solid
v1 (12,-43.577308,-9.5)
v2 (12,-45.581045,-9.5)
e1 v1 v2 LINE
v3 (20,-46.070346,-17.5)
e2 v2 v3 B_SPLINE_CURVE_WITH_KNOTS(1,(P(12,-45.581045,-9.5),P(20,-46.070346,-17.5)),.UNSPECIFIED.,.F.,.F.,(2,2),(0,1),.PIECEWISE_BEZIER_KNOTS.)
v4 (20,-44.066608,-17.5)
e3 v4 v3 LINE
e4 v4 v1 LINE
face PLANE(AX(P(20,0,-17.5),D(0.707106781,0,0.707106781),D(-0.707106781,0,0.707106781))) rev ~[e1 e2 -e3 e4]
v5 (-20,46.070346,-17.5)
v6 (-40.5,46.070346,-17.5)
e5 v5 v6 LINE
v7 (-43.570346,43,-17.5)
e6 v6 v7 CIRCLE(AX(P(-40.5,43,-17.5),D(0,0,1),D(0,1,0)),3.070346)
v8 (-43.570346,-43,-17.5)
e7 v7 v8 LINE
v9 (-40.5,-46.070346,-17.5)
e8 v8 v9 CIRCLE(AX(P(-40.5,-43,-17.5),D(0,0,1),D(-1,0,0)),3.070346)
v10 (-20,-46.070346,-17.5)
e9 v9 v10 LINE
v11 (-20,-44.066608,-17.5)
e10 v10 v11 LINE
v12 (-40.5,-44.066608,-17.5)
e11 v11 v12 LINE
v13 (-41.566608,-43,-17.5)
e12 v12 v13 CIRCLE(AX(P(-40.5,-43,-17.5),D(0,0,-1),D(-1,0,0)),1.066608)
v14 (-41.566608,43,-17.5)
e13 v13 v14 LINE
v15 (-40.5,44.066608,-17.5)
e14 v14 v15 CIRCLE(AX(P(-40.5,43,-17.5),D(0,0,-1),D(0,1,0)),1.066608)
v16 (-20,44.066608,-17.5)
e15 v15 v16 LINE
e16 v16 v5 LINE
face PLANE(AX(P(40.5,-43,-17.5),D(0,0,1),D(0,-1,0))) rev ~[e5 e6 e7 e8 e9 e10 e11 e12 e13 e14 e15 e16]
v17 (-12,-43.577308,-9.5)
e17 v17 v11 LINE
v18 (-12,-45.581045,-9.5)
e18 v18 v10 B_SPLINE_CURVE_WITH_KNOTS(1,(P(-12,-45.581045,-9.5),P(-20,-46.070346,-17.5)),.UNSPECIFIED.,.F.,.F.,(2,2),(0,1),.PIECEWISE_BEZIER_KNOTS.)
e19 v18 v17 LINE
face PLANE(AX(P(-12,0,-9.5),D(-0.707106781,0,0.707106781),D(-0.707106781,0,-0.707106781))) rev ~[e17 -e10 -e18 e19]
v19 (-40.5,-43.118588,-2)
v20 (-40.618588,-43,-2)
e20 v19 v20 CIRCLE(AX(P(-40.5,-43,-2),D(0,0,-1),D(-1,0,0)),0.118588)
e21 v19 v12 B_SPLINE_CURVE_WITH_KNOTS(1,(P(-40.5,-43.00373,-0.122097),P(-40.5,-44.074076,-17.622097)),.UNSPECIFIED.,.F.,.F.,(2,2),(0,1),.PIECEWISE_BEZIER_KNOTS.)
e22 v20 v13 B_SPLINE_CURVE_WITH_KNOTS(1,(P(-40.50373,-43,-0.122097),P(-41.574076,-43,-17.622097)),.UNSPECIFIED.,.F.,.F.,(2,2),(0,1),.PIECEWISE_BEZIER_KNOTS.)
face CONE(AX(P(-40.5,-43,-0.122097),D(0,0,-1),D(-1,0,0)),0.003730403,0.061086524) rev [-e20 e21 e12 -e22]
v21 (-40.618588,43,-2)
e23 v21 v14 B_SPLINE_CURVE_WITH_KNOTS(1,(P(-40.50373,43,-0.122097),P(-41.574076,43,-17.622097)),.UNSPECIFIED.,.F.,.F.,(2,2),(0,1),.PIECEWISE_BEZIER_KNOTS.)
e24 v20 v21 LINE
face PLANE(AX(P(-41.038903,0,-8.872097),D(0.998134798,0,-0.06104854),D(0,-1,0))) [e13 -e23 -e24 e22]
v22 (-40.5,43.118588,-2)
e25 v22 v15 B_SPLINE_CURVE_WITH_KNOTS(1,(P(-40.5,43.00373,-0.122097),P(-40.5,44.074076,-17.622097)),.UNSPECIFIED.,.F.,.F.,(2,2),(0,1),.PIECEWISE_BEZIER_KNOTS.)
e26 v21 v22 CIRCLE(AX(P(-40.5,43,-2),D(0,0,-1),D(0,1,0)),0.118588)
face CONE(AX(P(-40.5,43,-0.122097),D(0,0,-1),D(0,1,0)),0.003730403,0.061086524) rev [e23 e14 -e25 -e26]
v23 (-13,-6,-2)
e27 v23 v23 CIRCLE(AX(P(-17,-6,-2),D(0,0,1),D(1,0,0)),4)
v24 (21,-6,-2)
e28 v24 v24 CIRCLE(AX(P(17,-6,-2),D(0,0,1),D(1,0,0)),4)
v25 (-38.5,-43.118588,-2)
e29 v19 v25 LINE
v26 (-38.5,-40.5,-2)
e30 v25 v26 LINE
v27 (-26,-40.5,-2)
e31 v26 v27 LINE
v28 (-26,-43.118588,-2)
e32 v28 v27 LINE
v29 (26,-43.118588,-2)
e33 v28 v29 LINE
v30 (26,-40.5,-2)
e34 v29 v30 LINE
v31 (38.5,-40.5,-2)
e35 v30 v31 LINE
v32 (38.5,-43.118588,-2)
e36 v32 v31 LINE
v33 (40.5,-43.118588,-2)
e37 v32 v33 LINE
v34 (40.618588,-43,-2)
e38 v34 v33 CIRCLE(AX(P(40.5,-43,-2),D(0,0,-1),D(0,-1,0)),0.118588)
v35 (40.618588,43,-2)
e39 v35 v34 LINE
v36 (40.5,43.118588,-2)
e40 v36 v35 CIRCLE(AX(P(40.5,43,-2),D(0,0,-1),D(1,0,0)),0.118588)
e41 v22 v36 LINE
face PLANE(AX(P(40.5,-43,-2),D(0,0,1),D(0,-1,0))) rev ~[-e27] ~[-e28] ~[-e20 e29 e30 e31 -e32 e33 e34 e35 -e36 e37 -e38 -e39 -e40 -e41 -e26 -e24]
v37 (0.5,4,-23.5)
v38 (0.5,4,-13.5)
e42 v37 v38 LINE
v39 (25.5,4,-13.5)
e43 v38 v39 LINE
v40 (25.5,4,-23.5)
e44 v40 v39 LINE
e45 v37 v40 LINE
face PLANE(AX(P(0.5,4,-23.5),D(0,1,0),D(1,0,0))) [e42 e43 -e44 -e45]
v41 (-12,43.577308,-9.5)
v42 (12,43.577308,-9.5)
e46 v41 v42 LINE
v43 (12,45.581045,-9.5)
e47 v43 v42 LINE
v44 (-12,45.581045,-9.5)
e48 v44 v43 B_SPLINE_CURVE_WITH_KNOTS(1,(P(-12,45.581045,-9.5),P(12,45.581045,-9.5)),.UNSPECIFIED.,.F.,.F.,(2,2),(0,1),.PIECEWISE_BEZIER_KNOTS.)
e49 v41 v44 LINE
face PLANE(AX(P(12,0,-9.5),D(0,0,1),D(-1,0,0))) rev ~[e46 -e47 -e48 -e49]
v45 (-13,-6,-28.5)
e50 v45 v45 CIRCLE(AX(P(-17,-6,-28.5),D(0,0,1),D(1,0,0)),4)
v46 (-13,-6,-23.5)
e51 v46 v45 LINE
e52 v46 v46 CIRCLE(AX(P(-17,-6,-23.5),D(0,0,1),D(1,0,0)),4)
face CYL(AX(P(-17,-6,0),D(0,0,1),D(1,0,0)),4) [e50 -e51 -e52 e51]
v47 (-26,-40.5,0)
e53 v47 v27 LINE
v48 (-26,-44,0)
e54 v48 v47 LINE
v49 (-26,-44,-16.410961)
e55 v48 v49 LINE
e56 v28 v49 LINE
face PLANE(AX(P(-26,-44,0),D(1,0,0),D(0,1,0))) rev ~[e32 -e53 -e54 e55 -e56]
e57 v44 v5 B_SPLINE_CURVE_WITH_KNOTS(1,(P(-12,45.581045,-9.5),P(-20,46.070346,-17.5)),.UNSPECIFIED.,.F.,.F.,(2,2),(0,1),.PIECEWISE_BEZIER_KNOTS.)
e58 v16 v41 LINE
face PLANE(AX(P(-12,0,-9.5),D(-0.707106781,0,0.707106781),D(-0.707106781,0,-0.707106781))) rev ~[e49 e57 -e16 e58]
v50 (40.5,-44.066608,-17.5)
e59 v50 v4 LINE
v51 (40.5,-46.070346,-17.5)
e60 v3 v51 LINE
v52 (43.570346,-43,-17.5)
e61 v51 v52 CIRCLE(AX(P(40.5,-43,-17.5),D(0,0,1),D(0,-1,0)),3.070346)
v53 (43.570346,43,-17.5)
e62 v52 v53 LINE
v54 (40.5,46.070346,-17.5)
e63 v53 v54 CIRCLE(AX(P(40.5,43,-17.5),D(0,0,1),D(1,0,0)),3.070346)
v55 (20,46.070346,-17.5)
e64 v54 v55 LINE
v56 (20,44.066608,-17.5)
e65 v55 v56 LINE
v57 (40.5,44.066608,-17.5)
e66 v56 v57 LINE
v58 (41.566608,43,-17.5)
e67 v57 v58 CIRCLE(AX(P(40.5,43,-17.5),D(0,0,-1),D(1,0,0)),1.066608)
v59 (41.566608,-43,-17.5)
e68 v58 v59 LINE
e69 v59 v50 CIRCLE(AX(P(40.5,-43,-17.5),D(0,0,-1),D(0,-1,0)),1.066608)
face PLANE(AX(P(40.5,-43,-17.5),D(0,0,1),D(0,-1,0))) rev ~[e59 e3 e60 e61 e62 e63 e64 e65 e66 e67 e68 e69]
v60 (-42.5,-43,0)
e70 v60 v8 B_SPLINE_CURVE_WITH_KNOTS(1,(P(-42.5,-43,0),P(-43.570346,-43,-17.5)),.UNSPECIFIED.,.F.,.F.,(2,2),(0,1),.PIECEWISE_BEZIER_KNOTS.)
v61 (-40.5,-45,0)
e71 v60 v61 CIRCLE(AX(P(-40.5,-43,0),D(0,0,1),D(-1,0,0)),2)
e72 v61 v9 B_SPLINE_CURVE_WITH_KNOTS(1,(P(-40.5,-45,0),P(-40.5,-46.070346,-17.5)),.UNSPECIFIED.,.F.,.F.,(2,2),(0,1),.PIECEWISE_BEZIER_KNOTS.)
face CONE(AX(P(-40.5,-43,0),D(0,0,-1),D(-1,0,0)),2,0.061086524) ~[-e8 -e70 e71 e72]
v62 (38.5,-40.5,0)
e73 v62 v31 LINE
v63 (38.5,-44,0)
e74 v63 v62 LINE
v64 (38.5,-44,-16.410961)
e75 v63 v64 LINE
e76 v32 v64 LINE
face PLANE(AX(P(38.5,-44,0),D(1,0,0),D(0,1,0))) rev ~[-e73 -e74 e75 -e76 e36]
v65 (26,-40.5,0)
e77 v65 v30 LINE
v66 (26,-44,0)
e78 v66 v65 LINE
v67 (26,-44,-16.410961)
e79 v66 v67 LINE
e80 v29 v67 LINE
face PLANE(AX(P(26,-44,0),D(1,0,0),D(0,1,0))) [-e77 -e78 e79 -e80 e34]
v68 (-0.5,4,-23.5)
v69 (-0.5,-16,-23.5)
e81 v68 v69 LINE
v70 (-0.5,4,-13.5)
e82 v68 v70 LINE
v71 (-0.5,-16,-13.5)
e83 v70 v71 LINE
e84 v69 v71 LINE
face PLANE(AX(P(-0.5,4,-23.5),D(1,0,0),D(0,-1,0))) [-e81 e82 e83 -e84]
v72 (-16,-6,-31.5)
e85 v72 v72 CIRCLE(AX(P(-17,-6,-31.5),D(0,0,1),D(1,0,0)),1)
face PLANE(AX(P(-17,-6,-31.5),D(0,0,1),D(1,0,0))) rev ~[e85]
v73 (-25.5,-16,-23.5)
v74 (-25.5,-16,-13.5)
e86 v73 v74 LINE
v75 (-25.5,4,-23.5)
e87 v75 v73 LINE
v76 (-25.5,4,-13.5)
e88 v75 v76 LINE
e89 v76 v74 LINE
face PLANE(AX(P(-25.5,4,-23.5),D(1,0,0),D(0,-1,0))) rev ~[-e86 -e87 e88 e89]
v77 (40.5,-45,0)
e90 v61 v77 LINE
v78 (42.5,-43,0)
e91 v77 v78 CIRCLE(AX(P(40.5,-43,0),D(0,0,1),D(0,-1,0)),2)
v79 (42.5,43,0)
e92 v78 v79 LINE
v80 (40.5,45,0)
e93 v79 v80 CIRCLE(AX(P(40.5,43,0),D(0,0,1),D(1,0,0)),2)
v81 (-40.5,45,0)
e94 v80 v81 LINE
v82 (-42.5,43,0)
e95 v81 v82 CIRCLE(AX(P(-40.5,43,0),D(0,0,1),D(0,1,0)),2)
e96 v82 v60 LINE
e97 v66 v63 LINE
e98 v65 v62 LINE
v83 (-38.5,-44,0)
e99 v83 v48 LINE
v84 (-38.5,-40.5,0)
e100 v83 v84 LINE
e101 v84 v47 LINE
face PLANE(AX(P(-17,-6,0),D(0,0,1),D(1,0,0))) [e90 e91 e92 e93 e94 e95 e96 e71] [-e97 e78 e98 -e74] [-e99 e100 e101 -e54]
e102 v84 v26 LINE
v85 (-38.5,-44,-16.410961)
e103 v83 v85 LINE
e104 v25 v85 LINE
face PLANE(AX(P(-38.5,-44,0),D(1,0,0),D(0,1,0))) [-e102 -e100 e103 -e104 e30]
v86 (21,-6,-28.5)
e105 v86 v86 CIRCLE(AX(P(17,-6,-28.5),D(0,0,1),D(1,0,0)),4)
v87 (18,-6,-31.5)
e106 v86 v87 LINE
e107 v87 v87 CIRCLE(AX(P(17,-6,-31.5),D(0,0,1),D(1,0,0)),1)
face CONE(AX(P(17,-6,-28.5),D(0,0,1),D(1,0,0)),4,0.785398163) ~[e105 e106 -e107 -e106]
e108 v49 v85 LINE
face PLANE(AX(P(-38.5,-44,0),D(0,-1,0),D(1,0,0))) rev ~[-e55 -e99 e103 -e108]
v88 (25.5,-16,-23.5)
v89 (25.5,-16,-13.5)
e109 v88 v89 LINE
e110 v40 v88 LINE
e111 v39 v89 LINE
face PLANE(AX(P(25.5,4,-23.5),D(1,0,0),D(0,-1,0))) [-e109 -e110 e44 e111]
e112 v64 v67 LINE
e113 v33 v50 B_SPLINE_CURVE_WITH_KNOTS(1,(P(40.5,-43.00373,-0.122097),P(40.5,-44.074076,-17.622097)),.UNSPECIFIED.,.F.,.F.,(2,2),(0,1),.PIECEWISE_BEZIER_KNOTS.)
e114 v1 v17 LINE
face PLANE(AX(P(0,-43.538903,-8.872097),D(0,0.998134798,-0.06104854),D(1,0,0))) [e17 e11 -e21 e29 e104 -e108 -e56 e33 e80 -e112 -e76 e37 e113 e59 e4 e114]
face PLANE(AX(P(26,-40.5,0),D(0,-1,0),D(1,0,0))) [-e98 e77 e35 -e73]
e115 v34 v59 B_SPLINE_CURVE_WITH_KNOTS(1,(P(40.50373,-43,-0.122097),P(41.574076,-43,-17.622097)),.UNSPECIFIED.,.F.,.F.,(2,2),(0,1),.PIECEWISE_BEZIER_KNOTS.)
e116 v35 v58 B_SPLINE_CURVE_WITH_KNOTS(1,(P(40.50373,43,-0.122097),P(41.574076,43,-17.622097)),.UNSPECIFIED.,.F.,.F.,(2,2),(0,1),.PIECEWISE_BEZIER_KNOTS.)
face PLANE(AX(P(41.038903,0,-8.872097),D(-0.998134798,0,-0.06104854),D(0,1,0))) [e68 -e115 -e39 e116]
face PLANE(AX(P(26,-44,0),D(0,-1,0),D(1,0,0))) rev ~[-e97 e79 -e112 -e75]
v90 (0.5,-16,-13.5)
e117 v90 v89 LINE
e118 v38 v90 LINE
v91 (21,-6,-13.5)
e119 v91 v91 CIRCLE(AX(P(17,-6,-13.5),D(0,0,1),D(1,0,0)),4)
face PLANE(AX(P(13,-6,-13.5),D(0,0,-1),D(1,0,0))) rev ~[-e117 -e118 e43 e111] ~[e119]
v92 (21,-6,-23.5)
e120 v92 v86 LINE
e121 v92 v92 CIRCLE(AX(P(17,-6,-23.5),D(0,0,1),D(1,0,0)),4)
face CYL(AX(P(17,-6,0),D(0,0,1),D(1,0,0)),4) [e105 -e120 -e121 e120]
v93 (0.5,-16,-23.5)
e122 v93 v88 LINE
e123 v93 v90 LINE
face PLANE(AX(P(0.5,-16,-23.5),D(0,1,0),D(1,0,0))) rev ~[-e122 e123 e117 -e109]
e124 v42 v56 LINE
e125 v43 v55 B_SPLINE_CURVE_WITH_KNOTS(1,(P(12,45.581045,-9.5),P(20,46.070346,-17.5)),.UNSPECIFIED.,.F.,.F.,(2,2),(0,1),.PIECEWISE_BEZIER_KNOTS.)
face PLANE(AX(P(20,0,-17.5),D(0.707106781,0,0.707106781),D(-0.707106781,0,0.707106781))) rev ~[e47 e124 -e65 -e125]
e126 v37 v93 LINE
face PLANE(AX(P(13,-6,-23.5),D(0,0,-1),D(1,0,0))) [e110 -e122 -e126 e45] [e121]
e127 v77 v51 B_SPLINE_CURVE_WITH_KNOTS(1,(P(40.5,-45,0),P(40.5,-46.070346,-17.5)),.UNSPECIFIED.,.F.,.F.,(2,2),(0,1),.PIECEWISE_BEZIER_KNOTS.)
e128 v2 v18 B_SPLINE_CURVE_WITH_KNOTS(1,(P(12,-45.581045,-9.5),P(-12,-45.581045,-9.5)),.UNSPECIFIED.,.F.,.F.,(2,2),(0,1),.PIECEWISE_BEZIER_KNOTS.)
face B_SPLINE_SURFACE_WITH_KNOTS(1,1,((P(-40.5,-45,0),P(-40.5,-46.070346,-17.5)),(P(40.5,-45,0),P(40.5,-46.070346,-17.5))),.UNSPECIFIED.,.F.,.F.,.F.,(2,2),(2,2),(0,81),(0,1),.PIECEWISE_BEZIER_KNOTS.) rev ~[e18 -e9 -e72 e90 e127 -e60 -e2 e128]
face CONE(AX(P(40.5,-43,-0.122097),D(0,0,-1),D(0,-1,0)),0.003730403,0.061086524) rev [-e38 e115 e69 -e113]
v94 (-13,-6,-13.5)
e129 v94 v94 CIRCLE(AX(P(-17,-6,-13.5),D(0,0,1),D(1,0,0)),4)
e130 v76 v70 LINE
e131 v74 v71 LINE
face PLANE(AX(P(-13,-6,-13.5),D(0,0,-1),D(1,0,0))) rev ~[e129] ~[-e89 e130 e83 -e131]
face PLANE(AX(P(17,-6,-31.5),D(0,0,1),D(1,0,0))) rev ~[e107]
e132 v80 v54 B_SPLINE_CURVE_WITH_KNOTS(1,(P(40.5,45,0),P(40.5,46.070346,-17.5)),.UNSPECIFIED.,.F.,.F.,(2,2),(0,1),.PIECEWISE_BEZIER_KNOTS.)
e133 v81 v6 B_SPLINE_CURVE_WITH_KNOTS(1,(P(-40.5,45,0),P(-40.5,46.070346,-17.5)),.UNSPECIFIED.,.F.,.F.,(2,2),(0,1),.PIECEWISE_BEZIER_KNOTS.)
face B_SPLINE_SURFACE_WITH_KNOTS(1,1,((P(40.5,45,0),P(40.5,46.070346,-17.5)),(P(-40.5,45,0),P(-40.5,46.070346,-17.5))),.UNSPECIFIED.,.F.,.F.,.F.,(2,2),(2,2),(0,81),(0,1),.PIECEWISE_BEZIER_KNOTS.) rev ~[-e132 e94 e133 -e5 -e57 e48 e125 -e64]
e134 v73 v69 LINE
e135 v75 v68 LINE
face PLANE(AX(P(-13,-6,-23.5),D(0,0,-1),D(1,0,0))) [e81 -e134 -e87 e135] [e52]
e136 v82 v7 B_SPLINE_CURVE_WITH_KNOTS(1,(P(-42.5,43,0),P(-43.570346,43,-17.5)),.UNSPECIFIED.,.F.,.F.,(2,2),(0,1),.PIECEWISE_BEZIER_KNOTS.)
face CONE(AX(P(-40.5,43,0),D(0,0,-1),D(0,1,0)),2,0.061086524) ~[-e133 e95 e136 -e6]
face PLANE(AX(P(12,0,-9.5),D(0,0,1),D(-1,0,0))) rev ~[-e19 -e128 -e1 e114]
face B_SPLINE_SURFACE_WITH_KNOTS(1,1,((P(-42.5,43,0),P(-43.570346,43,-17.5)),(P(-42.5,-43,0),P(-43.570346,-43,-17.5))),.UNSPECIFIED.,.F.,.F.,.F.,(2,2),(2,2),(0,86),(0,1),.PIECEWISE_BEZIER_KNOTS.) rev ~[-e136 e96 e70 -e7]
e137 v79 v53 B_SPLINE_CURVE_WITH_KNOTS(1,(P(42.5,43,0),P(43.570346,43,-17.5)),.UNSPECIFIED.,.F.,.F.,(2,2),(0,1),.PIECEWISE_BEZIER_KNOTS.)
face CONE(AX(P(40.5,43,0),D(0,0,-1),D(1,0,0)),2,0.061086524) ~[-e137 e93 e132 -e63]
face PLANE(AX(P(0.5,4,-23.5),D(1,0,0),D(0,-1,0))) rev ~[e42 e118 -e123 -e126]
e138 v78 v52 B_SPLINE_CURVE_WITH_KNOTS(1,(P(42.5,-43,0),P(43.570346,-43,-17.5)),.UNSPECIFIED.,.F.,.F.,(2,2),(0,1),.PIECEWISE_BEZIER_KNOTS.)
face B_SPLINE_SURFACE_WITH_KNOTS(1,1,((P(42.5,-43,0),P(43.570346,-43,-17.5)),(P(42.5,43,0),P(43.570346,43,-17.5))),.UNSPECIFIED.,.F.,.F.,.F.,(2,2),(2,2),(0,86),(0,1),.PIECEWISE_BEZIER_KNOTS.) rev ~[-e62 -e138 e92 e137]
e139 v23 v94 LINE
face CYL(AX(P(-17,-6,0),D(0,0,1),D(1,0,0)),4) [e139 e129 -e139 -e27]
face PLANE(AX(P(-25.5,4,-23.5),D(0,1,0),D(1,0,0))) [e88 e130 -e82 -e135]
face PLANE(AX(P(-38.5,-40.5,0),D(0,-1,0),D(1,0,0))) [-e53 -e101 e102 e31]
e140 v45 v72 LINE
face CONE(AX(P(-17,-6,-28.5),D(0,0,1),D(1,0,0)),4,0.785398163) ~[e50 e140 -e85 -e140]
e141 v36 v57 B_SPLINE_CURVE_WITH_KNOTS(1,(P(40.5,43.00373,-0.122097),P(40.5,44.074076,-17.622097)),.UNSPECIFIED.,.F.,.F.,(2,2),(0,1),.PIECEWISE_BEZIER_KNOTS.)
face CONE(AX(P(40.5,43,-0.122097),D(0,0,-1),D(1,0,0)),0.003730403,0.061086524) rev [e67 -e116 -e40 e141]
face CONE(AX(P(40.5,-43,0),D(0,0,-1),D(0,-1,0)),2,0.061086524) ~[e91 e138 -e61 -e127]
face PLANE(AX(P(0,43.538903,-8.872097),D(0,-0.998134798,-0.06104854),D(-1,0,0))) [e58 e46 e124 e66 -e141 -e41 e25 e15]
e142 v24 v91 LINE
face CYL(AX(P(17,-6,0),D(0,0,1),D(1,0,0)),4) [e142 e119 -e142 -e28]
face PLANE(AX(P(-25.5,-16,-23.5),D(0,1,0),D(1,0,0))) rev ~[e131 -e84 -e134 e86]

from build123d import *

# Parameters (mm, degrees)
F1_DEPTH  = 17.5
F1_TAPER  = -3.5
F3_DEPTH  = 75
F4_T      = 2
F5_W      = 12.5
F5_H      = 3.5
F6_DEPTH  = 17.5010001
F7_R      = 4
F8_DEPTH  = 31.5
F9_SIZE   = 3
F11_W     = 25
F11_H     = 20
F12_DEPTH = 10


# Not quite as in the source:
# - a shell that OpenCascade refuses in one call is made with other operations: the cavity is built on its own and cut out


with BuildPart() as f1:
    # F0 (on Top) → F1 (new body)
    with BuildSketch(Plane.XY):
        with BuildLine():
            Line((-40.5, -45), (40.5, -45))
            ThreePointArc((40.5, -45), (41.9142135624, -44.4142135624), (42.5, -43))
            Line((42.5, -43), (42.5, 43))
            ThreePointArc((42.5, 43), (41.9142135624, 44.4142135624), (40.5, 45))
            Line((40.5, 45), (-40.5, 45))
            ThreePointArc((-40.5, 45), (-41.9142135624, 44.4142135624), (-42.5, 43))
            Line((-42.5, 43), (-42.5, -43))
            ThreePointArc((-42.5, -43), (-41.9142135624, -44.4142135624), (-40.5, -45))
        make_face()
    extrude(amount=-F1_DEPTH, taper=F1_TAPER)

    # F2 (on Front) → F3 (cut, symmetric)
    with BuildSketch(Plane.XZ):
        Polygon((-20, -17.5), (0, -17.5), (20, -17.5), (12, -9.5), (0, -9.5), (-12, -9.5), align=None)
    extrude(amount=F3_DEPTH, both=True, mode=Mode.SUBTRACT)

    # F4: shell of thickness 2, made by hand


with BuildPart() as f4_core1:
    # F4_t2: copy of F1
    add(f1.part)

    # the walls: a layer under each face that stays
    f4_faces = [f4_core1.faces().sort_by_distance(p)[0] for p in [
        (0, -45.5351729263, -8.75),
        (-42.2926379677, -44.7926379677, -8.75),
        (42.2926379677, -44.7926379677, -8.75),
        (0, 0, 0),
        (-43.0351729263, 0, -8.75),
        (-42.2926379677, 44.7926379677, -8.75),
        (0, 45.5351729263, -8.75),
        (42.2926379677, 44.7926379677, -8.75),
        (43.0351729263, 0, -8.75),
    ]]
    thicken(f4_faces, amount=-F4_T, mode=Mode.SUBTRACT)


with BuildPart() as f1_1:
    add(f1.part)

    # what is left inside the walls is the cavity
    f4_cavity = [f4_core1.part.solids().sort_by_distance(p)[0] for p in [
        (-13.539529, 0, -2.02),
    ]]
    add(f4_cavity, mode=Mode.SUBTRACT)

    # F5 (on Top) → F6 (cut, through all)
    with BuildSketch(Plane.XY):
        with Locations((-32.25, -42.25)):
            Rectangle(F5_W, F5_H)
        with Locations((32.25, -42.25)):
            Rectangle(F5_W, F5_H)
    extrude(amount=-F6_DEPTH, mode=Mode.SUBTRACT)

    # F7 (on Top) → F8 (join)
    with BuildSketch(Plane.XY):
        with Locations((-17, -6)):
            Circle(F7_R)
        with Locations((17, -6)):
            Circle(F7_R)
    extrude(amount=-F8_DEPTH)

    # F9
    f9_edges = [f1_1.edges().sort_by_distance(p)[0] for p in [
        (-21, -6, -31.5),
        (13, -6, -31.5),
    ]]
    chamfer(f9_edges, length=F9_SIZE)

    # F11 (on offset) → F12 (join)
    with BuildSketch(Plane(origin=(0, 0, -23.5), x_dir=(1, 0, 0), z_dir=(0, 0, -1))):
        with Locations((-13, 6)):
            Rectangle(F11_W, F11_H)
        with Locations((13, 6)):
            Rectangle(F11_W, F11_H)
    extrude(amount=-F12_DEPTH)


solid = f1_1.part
